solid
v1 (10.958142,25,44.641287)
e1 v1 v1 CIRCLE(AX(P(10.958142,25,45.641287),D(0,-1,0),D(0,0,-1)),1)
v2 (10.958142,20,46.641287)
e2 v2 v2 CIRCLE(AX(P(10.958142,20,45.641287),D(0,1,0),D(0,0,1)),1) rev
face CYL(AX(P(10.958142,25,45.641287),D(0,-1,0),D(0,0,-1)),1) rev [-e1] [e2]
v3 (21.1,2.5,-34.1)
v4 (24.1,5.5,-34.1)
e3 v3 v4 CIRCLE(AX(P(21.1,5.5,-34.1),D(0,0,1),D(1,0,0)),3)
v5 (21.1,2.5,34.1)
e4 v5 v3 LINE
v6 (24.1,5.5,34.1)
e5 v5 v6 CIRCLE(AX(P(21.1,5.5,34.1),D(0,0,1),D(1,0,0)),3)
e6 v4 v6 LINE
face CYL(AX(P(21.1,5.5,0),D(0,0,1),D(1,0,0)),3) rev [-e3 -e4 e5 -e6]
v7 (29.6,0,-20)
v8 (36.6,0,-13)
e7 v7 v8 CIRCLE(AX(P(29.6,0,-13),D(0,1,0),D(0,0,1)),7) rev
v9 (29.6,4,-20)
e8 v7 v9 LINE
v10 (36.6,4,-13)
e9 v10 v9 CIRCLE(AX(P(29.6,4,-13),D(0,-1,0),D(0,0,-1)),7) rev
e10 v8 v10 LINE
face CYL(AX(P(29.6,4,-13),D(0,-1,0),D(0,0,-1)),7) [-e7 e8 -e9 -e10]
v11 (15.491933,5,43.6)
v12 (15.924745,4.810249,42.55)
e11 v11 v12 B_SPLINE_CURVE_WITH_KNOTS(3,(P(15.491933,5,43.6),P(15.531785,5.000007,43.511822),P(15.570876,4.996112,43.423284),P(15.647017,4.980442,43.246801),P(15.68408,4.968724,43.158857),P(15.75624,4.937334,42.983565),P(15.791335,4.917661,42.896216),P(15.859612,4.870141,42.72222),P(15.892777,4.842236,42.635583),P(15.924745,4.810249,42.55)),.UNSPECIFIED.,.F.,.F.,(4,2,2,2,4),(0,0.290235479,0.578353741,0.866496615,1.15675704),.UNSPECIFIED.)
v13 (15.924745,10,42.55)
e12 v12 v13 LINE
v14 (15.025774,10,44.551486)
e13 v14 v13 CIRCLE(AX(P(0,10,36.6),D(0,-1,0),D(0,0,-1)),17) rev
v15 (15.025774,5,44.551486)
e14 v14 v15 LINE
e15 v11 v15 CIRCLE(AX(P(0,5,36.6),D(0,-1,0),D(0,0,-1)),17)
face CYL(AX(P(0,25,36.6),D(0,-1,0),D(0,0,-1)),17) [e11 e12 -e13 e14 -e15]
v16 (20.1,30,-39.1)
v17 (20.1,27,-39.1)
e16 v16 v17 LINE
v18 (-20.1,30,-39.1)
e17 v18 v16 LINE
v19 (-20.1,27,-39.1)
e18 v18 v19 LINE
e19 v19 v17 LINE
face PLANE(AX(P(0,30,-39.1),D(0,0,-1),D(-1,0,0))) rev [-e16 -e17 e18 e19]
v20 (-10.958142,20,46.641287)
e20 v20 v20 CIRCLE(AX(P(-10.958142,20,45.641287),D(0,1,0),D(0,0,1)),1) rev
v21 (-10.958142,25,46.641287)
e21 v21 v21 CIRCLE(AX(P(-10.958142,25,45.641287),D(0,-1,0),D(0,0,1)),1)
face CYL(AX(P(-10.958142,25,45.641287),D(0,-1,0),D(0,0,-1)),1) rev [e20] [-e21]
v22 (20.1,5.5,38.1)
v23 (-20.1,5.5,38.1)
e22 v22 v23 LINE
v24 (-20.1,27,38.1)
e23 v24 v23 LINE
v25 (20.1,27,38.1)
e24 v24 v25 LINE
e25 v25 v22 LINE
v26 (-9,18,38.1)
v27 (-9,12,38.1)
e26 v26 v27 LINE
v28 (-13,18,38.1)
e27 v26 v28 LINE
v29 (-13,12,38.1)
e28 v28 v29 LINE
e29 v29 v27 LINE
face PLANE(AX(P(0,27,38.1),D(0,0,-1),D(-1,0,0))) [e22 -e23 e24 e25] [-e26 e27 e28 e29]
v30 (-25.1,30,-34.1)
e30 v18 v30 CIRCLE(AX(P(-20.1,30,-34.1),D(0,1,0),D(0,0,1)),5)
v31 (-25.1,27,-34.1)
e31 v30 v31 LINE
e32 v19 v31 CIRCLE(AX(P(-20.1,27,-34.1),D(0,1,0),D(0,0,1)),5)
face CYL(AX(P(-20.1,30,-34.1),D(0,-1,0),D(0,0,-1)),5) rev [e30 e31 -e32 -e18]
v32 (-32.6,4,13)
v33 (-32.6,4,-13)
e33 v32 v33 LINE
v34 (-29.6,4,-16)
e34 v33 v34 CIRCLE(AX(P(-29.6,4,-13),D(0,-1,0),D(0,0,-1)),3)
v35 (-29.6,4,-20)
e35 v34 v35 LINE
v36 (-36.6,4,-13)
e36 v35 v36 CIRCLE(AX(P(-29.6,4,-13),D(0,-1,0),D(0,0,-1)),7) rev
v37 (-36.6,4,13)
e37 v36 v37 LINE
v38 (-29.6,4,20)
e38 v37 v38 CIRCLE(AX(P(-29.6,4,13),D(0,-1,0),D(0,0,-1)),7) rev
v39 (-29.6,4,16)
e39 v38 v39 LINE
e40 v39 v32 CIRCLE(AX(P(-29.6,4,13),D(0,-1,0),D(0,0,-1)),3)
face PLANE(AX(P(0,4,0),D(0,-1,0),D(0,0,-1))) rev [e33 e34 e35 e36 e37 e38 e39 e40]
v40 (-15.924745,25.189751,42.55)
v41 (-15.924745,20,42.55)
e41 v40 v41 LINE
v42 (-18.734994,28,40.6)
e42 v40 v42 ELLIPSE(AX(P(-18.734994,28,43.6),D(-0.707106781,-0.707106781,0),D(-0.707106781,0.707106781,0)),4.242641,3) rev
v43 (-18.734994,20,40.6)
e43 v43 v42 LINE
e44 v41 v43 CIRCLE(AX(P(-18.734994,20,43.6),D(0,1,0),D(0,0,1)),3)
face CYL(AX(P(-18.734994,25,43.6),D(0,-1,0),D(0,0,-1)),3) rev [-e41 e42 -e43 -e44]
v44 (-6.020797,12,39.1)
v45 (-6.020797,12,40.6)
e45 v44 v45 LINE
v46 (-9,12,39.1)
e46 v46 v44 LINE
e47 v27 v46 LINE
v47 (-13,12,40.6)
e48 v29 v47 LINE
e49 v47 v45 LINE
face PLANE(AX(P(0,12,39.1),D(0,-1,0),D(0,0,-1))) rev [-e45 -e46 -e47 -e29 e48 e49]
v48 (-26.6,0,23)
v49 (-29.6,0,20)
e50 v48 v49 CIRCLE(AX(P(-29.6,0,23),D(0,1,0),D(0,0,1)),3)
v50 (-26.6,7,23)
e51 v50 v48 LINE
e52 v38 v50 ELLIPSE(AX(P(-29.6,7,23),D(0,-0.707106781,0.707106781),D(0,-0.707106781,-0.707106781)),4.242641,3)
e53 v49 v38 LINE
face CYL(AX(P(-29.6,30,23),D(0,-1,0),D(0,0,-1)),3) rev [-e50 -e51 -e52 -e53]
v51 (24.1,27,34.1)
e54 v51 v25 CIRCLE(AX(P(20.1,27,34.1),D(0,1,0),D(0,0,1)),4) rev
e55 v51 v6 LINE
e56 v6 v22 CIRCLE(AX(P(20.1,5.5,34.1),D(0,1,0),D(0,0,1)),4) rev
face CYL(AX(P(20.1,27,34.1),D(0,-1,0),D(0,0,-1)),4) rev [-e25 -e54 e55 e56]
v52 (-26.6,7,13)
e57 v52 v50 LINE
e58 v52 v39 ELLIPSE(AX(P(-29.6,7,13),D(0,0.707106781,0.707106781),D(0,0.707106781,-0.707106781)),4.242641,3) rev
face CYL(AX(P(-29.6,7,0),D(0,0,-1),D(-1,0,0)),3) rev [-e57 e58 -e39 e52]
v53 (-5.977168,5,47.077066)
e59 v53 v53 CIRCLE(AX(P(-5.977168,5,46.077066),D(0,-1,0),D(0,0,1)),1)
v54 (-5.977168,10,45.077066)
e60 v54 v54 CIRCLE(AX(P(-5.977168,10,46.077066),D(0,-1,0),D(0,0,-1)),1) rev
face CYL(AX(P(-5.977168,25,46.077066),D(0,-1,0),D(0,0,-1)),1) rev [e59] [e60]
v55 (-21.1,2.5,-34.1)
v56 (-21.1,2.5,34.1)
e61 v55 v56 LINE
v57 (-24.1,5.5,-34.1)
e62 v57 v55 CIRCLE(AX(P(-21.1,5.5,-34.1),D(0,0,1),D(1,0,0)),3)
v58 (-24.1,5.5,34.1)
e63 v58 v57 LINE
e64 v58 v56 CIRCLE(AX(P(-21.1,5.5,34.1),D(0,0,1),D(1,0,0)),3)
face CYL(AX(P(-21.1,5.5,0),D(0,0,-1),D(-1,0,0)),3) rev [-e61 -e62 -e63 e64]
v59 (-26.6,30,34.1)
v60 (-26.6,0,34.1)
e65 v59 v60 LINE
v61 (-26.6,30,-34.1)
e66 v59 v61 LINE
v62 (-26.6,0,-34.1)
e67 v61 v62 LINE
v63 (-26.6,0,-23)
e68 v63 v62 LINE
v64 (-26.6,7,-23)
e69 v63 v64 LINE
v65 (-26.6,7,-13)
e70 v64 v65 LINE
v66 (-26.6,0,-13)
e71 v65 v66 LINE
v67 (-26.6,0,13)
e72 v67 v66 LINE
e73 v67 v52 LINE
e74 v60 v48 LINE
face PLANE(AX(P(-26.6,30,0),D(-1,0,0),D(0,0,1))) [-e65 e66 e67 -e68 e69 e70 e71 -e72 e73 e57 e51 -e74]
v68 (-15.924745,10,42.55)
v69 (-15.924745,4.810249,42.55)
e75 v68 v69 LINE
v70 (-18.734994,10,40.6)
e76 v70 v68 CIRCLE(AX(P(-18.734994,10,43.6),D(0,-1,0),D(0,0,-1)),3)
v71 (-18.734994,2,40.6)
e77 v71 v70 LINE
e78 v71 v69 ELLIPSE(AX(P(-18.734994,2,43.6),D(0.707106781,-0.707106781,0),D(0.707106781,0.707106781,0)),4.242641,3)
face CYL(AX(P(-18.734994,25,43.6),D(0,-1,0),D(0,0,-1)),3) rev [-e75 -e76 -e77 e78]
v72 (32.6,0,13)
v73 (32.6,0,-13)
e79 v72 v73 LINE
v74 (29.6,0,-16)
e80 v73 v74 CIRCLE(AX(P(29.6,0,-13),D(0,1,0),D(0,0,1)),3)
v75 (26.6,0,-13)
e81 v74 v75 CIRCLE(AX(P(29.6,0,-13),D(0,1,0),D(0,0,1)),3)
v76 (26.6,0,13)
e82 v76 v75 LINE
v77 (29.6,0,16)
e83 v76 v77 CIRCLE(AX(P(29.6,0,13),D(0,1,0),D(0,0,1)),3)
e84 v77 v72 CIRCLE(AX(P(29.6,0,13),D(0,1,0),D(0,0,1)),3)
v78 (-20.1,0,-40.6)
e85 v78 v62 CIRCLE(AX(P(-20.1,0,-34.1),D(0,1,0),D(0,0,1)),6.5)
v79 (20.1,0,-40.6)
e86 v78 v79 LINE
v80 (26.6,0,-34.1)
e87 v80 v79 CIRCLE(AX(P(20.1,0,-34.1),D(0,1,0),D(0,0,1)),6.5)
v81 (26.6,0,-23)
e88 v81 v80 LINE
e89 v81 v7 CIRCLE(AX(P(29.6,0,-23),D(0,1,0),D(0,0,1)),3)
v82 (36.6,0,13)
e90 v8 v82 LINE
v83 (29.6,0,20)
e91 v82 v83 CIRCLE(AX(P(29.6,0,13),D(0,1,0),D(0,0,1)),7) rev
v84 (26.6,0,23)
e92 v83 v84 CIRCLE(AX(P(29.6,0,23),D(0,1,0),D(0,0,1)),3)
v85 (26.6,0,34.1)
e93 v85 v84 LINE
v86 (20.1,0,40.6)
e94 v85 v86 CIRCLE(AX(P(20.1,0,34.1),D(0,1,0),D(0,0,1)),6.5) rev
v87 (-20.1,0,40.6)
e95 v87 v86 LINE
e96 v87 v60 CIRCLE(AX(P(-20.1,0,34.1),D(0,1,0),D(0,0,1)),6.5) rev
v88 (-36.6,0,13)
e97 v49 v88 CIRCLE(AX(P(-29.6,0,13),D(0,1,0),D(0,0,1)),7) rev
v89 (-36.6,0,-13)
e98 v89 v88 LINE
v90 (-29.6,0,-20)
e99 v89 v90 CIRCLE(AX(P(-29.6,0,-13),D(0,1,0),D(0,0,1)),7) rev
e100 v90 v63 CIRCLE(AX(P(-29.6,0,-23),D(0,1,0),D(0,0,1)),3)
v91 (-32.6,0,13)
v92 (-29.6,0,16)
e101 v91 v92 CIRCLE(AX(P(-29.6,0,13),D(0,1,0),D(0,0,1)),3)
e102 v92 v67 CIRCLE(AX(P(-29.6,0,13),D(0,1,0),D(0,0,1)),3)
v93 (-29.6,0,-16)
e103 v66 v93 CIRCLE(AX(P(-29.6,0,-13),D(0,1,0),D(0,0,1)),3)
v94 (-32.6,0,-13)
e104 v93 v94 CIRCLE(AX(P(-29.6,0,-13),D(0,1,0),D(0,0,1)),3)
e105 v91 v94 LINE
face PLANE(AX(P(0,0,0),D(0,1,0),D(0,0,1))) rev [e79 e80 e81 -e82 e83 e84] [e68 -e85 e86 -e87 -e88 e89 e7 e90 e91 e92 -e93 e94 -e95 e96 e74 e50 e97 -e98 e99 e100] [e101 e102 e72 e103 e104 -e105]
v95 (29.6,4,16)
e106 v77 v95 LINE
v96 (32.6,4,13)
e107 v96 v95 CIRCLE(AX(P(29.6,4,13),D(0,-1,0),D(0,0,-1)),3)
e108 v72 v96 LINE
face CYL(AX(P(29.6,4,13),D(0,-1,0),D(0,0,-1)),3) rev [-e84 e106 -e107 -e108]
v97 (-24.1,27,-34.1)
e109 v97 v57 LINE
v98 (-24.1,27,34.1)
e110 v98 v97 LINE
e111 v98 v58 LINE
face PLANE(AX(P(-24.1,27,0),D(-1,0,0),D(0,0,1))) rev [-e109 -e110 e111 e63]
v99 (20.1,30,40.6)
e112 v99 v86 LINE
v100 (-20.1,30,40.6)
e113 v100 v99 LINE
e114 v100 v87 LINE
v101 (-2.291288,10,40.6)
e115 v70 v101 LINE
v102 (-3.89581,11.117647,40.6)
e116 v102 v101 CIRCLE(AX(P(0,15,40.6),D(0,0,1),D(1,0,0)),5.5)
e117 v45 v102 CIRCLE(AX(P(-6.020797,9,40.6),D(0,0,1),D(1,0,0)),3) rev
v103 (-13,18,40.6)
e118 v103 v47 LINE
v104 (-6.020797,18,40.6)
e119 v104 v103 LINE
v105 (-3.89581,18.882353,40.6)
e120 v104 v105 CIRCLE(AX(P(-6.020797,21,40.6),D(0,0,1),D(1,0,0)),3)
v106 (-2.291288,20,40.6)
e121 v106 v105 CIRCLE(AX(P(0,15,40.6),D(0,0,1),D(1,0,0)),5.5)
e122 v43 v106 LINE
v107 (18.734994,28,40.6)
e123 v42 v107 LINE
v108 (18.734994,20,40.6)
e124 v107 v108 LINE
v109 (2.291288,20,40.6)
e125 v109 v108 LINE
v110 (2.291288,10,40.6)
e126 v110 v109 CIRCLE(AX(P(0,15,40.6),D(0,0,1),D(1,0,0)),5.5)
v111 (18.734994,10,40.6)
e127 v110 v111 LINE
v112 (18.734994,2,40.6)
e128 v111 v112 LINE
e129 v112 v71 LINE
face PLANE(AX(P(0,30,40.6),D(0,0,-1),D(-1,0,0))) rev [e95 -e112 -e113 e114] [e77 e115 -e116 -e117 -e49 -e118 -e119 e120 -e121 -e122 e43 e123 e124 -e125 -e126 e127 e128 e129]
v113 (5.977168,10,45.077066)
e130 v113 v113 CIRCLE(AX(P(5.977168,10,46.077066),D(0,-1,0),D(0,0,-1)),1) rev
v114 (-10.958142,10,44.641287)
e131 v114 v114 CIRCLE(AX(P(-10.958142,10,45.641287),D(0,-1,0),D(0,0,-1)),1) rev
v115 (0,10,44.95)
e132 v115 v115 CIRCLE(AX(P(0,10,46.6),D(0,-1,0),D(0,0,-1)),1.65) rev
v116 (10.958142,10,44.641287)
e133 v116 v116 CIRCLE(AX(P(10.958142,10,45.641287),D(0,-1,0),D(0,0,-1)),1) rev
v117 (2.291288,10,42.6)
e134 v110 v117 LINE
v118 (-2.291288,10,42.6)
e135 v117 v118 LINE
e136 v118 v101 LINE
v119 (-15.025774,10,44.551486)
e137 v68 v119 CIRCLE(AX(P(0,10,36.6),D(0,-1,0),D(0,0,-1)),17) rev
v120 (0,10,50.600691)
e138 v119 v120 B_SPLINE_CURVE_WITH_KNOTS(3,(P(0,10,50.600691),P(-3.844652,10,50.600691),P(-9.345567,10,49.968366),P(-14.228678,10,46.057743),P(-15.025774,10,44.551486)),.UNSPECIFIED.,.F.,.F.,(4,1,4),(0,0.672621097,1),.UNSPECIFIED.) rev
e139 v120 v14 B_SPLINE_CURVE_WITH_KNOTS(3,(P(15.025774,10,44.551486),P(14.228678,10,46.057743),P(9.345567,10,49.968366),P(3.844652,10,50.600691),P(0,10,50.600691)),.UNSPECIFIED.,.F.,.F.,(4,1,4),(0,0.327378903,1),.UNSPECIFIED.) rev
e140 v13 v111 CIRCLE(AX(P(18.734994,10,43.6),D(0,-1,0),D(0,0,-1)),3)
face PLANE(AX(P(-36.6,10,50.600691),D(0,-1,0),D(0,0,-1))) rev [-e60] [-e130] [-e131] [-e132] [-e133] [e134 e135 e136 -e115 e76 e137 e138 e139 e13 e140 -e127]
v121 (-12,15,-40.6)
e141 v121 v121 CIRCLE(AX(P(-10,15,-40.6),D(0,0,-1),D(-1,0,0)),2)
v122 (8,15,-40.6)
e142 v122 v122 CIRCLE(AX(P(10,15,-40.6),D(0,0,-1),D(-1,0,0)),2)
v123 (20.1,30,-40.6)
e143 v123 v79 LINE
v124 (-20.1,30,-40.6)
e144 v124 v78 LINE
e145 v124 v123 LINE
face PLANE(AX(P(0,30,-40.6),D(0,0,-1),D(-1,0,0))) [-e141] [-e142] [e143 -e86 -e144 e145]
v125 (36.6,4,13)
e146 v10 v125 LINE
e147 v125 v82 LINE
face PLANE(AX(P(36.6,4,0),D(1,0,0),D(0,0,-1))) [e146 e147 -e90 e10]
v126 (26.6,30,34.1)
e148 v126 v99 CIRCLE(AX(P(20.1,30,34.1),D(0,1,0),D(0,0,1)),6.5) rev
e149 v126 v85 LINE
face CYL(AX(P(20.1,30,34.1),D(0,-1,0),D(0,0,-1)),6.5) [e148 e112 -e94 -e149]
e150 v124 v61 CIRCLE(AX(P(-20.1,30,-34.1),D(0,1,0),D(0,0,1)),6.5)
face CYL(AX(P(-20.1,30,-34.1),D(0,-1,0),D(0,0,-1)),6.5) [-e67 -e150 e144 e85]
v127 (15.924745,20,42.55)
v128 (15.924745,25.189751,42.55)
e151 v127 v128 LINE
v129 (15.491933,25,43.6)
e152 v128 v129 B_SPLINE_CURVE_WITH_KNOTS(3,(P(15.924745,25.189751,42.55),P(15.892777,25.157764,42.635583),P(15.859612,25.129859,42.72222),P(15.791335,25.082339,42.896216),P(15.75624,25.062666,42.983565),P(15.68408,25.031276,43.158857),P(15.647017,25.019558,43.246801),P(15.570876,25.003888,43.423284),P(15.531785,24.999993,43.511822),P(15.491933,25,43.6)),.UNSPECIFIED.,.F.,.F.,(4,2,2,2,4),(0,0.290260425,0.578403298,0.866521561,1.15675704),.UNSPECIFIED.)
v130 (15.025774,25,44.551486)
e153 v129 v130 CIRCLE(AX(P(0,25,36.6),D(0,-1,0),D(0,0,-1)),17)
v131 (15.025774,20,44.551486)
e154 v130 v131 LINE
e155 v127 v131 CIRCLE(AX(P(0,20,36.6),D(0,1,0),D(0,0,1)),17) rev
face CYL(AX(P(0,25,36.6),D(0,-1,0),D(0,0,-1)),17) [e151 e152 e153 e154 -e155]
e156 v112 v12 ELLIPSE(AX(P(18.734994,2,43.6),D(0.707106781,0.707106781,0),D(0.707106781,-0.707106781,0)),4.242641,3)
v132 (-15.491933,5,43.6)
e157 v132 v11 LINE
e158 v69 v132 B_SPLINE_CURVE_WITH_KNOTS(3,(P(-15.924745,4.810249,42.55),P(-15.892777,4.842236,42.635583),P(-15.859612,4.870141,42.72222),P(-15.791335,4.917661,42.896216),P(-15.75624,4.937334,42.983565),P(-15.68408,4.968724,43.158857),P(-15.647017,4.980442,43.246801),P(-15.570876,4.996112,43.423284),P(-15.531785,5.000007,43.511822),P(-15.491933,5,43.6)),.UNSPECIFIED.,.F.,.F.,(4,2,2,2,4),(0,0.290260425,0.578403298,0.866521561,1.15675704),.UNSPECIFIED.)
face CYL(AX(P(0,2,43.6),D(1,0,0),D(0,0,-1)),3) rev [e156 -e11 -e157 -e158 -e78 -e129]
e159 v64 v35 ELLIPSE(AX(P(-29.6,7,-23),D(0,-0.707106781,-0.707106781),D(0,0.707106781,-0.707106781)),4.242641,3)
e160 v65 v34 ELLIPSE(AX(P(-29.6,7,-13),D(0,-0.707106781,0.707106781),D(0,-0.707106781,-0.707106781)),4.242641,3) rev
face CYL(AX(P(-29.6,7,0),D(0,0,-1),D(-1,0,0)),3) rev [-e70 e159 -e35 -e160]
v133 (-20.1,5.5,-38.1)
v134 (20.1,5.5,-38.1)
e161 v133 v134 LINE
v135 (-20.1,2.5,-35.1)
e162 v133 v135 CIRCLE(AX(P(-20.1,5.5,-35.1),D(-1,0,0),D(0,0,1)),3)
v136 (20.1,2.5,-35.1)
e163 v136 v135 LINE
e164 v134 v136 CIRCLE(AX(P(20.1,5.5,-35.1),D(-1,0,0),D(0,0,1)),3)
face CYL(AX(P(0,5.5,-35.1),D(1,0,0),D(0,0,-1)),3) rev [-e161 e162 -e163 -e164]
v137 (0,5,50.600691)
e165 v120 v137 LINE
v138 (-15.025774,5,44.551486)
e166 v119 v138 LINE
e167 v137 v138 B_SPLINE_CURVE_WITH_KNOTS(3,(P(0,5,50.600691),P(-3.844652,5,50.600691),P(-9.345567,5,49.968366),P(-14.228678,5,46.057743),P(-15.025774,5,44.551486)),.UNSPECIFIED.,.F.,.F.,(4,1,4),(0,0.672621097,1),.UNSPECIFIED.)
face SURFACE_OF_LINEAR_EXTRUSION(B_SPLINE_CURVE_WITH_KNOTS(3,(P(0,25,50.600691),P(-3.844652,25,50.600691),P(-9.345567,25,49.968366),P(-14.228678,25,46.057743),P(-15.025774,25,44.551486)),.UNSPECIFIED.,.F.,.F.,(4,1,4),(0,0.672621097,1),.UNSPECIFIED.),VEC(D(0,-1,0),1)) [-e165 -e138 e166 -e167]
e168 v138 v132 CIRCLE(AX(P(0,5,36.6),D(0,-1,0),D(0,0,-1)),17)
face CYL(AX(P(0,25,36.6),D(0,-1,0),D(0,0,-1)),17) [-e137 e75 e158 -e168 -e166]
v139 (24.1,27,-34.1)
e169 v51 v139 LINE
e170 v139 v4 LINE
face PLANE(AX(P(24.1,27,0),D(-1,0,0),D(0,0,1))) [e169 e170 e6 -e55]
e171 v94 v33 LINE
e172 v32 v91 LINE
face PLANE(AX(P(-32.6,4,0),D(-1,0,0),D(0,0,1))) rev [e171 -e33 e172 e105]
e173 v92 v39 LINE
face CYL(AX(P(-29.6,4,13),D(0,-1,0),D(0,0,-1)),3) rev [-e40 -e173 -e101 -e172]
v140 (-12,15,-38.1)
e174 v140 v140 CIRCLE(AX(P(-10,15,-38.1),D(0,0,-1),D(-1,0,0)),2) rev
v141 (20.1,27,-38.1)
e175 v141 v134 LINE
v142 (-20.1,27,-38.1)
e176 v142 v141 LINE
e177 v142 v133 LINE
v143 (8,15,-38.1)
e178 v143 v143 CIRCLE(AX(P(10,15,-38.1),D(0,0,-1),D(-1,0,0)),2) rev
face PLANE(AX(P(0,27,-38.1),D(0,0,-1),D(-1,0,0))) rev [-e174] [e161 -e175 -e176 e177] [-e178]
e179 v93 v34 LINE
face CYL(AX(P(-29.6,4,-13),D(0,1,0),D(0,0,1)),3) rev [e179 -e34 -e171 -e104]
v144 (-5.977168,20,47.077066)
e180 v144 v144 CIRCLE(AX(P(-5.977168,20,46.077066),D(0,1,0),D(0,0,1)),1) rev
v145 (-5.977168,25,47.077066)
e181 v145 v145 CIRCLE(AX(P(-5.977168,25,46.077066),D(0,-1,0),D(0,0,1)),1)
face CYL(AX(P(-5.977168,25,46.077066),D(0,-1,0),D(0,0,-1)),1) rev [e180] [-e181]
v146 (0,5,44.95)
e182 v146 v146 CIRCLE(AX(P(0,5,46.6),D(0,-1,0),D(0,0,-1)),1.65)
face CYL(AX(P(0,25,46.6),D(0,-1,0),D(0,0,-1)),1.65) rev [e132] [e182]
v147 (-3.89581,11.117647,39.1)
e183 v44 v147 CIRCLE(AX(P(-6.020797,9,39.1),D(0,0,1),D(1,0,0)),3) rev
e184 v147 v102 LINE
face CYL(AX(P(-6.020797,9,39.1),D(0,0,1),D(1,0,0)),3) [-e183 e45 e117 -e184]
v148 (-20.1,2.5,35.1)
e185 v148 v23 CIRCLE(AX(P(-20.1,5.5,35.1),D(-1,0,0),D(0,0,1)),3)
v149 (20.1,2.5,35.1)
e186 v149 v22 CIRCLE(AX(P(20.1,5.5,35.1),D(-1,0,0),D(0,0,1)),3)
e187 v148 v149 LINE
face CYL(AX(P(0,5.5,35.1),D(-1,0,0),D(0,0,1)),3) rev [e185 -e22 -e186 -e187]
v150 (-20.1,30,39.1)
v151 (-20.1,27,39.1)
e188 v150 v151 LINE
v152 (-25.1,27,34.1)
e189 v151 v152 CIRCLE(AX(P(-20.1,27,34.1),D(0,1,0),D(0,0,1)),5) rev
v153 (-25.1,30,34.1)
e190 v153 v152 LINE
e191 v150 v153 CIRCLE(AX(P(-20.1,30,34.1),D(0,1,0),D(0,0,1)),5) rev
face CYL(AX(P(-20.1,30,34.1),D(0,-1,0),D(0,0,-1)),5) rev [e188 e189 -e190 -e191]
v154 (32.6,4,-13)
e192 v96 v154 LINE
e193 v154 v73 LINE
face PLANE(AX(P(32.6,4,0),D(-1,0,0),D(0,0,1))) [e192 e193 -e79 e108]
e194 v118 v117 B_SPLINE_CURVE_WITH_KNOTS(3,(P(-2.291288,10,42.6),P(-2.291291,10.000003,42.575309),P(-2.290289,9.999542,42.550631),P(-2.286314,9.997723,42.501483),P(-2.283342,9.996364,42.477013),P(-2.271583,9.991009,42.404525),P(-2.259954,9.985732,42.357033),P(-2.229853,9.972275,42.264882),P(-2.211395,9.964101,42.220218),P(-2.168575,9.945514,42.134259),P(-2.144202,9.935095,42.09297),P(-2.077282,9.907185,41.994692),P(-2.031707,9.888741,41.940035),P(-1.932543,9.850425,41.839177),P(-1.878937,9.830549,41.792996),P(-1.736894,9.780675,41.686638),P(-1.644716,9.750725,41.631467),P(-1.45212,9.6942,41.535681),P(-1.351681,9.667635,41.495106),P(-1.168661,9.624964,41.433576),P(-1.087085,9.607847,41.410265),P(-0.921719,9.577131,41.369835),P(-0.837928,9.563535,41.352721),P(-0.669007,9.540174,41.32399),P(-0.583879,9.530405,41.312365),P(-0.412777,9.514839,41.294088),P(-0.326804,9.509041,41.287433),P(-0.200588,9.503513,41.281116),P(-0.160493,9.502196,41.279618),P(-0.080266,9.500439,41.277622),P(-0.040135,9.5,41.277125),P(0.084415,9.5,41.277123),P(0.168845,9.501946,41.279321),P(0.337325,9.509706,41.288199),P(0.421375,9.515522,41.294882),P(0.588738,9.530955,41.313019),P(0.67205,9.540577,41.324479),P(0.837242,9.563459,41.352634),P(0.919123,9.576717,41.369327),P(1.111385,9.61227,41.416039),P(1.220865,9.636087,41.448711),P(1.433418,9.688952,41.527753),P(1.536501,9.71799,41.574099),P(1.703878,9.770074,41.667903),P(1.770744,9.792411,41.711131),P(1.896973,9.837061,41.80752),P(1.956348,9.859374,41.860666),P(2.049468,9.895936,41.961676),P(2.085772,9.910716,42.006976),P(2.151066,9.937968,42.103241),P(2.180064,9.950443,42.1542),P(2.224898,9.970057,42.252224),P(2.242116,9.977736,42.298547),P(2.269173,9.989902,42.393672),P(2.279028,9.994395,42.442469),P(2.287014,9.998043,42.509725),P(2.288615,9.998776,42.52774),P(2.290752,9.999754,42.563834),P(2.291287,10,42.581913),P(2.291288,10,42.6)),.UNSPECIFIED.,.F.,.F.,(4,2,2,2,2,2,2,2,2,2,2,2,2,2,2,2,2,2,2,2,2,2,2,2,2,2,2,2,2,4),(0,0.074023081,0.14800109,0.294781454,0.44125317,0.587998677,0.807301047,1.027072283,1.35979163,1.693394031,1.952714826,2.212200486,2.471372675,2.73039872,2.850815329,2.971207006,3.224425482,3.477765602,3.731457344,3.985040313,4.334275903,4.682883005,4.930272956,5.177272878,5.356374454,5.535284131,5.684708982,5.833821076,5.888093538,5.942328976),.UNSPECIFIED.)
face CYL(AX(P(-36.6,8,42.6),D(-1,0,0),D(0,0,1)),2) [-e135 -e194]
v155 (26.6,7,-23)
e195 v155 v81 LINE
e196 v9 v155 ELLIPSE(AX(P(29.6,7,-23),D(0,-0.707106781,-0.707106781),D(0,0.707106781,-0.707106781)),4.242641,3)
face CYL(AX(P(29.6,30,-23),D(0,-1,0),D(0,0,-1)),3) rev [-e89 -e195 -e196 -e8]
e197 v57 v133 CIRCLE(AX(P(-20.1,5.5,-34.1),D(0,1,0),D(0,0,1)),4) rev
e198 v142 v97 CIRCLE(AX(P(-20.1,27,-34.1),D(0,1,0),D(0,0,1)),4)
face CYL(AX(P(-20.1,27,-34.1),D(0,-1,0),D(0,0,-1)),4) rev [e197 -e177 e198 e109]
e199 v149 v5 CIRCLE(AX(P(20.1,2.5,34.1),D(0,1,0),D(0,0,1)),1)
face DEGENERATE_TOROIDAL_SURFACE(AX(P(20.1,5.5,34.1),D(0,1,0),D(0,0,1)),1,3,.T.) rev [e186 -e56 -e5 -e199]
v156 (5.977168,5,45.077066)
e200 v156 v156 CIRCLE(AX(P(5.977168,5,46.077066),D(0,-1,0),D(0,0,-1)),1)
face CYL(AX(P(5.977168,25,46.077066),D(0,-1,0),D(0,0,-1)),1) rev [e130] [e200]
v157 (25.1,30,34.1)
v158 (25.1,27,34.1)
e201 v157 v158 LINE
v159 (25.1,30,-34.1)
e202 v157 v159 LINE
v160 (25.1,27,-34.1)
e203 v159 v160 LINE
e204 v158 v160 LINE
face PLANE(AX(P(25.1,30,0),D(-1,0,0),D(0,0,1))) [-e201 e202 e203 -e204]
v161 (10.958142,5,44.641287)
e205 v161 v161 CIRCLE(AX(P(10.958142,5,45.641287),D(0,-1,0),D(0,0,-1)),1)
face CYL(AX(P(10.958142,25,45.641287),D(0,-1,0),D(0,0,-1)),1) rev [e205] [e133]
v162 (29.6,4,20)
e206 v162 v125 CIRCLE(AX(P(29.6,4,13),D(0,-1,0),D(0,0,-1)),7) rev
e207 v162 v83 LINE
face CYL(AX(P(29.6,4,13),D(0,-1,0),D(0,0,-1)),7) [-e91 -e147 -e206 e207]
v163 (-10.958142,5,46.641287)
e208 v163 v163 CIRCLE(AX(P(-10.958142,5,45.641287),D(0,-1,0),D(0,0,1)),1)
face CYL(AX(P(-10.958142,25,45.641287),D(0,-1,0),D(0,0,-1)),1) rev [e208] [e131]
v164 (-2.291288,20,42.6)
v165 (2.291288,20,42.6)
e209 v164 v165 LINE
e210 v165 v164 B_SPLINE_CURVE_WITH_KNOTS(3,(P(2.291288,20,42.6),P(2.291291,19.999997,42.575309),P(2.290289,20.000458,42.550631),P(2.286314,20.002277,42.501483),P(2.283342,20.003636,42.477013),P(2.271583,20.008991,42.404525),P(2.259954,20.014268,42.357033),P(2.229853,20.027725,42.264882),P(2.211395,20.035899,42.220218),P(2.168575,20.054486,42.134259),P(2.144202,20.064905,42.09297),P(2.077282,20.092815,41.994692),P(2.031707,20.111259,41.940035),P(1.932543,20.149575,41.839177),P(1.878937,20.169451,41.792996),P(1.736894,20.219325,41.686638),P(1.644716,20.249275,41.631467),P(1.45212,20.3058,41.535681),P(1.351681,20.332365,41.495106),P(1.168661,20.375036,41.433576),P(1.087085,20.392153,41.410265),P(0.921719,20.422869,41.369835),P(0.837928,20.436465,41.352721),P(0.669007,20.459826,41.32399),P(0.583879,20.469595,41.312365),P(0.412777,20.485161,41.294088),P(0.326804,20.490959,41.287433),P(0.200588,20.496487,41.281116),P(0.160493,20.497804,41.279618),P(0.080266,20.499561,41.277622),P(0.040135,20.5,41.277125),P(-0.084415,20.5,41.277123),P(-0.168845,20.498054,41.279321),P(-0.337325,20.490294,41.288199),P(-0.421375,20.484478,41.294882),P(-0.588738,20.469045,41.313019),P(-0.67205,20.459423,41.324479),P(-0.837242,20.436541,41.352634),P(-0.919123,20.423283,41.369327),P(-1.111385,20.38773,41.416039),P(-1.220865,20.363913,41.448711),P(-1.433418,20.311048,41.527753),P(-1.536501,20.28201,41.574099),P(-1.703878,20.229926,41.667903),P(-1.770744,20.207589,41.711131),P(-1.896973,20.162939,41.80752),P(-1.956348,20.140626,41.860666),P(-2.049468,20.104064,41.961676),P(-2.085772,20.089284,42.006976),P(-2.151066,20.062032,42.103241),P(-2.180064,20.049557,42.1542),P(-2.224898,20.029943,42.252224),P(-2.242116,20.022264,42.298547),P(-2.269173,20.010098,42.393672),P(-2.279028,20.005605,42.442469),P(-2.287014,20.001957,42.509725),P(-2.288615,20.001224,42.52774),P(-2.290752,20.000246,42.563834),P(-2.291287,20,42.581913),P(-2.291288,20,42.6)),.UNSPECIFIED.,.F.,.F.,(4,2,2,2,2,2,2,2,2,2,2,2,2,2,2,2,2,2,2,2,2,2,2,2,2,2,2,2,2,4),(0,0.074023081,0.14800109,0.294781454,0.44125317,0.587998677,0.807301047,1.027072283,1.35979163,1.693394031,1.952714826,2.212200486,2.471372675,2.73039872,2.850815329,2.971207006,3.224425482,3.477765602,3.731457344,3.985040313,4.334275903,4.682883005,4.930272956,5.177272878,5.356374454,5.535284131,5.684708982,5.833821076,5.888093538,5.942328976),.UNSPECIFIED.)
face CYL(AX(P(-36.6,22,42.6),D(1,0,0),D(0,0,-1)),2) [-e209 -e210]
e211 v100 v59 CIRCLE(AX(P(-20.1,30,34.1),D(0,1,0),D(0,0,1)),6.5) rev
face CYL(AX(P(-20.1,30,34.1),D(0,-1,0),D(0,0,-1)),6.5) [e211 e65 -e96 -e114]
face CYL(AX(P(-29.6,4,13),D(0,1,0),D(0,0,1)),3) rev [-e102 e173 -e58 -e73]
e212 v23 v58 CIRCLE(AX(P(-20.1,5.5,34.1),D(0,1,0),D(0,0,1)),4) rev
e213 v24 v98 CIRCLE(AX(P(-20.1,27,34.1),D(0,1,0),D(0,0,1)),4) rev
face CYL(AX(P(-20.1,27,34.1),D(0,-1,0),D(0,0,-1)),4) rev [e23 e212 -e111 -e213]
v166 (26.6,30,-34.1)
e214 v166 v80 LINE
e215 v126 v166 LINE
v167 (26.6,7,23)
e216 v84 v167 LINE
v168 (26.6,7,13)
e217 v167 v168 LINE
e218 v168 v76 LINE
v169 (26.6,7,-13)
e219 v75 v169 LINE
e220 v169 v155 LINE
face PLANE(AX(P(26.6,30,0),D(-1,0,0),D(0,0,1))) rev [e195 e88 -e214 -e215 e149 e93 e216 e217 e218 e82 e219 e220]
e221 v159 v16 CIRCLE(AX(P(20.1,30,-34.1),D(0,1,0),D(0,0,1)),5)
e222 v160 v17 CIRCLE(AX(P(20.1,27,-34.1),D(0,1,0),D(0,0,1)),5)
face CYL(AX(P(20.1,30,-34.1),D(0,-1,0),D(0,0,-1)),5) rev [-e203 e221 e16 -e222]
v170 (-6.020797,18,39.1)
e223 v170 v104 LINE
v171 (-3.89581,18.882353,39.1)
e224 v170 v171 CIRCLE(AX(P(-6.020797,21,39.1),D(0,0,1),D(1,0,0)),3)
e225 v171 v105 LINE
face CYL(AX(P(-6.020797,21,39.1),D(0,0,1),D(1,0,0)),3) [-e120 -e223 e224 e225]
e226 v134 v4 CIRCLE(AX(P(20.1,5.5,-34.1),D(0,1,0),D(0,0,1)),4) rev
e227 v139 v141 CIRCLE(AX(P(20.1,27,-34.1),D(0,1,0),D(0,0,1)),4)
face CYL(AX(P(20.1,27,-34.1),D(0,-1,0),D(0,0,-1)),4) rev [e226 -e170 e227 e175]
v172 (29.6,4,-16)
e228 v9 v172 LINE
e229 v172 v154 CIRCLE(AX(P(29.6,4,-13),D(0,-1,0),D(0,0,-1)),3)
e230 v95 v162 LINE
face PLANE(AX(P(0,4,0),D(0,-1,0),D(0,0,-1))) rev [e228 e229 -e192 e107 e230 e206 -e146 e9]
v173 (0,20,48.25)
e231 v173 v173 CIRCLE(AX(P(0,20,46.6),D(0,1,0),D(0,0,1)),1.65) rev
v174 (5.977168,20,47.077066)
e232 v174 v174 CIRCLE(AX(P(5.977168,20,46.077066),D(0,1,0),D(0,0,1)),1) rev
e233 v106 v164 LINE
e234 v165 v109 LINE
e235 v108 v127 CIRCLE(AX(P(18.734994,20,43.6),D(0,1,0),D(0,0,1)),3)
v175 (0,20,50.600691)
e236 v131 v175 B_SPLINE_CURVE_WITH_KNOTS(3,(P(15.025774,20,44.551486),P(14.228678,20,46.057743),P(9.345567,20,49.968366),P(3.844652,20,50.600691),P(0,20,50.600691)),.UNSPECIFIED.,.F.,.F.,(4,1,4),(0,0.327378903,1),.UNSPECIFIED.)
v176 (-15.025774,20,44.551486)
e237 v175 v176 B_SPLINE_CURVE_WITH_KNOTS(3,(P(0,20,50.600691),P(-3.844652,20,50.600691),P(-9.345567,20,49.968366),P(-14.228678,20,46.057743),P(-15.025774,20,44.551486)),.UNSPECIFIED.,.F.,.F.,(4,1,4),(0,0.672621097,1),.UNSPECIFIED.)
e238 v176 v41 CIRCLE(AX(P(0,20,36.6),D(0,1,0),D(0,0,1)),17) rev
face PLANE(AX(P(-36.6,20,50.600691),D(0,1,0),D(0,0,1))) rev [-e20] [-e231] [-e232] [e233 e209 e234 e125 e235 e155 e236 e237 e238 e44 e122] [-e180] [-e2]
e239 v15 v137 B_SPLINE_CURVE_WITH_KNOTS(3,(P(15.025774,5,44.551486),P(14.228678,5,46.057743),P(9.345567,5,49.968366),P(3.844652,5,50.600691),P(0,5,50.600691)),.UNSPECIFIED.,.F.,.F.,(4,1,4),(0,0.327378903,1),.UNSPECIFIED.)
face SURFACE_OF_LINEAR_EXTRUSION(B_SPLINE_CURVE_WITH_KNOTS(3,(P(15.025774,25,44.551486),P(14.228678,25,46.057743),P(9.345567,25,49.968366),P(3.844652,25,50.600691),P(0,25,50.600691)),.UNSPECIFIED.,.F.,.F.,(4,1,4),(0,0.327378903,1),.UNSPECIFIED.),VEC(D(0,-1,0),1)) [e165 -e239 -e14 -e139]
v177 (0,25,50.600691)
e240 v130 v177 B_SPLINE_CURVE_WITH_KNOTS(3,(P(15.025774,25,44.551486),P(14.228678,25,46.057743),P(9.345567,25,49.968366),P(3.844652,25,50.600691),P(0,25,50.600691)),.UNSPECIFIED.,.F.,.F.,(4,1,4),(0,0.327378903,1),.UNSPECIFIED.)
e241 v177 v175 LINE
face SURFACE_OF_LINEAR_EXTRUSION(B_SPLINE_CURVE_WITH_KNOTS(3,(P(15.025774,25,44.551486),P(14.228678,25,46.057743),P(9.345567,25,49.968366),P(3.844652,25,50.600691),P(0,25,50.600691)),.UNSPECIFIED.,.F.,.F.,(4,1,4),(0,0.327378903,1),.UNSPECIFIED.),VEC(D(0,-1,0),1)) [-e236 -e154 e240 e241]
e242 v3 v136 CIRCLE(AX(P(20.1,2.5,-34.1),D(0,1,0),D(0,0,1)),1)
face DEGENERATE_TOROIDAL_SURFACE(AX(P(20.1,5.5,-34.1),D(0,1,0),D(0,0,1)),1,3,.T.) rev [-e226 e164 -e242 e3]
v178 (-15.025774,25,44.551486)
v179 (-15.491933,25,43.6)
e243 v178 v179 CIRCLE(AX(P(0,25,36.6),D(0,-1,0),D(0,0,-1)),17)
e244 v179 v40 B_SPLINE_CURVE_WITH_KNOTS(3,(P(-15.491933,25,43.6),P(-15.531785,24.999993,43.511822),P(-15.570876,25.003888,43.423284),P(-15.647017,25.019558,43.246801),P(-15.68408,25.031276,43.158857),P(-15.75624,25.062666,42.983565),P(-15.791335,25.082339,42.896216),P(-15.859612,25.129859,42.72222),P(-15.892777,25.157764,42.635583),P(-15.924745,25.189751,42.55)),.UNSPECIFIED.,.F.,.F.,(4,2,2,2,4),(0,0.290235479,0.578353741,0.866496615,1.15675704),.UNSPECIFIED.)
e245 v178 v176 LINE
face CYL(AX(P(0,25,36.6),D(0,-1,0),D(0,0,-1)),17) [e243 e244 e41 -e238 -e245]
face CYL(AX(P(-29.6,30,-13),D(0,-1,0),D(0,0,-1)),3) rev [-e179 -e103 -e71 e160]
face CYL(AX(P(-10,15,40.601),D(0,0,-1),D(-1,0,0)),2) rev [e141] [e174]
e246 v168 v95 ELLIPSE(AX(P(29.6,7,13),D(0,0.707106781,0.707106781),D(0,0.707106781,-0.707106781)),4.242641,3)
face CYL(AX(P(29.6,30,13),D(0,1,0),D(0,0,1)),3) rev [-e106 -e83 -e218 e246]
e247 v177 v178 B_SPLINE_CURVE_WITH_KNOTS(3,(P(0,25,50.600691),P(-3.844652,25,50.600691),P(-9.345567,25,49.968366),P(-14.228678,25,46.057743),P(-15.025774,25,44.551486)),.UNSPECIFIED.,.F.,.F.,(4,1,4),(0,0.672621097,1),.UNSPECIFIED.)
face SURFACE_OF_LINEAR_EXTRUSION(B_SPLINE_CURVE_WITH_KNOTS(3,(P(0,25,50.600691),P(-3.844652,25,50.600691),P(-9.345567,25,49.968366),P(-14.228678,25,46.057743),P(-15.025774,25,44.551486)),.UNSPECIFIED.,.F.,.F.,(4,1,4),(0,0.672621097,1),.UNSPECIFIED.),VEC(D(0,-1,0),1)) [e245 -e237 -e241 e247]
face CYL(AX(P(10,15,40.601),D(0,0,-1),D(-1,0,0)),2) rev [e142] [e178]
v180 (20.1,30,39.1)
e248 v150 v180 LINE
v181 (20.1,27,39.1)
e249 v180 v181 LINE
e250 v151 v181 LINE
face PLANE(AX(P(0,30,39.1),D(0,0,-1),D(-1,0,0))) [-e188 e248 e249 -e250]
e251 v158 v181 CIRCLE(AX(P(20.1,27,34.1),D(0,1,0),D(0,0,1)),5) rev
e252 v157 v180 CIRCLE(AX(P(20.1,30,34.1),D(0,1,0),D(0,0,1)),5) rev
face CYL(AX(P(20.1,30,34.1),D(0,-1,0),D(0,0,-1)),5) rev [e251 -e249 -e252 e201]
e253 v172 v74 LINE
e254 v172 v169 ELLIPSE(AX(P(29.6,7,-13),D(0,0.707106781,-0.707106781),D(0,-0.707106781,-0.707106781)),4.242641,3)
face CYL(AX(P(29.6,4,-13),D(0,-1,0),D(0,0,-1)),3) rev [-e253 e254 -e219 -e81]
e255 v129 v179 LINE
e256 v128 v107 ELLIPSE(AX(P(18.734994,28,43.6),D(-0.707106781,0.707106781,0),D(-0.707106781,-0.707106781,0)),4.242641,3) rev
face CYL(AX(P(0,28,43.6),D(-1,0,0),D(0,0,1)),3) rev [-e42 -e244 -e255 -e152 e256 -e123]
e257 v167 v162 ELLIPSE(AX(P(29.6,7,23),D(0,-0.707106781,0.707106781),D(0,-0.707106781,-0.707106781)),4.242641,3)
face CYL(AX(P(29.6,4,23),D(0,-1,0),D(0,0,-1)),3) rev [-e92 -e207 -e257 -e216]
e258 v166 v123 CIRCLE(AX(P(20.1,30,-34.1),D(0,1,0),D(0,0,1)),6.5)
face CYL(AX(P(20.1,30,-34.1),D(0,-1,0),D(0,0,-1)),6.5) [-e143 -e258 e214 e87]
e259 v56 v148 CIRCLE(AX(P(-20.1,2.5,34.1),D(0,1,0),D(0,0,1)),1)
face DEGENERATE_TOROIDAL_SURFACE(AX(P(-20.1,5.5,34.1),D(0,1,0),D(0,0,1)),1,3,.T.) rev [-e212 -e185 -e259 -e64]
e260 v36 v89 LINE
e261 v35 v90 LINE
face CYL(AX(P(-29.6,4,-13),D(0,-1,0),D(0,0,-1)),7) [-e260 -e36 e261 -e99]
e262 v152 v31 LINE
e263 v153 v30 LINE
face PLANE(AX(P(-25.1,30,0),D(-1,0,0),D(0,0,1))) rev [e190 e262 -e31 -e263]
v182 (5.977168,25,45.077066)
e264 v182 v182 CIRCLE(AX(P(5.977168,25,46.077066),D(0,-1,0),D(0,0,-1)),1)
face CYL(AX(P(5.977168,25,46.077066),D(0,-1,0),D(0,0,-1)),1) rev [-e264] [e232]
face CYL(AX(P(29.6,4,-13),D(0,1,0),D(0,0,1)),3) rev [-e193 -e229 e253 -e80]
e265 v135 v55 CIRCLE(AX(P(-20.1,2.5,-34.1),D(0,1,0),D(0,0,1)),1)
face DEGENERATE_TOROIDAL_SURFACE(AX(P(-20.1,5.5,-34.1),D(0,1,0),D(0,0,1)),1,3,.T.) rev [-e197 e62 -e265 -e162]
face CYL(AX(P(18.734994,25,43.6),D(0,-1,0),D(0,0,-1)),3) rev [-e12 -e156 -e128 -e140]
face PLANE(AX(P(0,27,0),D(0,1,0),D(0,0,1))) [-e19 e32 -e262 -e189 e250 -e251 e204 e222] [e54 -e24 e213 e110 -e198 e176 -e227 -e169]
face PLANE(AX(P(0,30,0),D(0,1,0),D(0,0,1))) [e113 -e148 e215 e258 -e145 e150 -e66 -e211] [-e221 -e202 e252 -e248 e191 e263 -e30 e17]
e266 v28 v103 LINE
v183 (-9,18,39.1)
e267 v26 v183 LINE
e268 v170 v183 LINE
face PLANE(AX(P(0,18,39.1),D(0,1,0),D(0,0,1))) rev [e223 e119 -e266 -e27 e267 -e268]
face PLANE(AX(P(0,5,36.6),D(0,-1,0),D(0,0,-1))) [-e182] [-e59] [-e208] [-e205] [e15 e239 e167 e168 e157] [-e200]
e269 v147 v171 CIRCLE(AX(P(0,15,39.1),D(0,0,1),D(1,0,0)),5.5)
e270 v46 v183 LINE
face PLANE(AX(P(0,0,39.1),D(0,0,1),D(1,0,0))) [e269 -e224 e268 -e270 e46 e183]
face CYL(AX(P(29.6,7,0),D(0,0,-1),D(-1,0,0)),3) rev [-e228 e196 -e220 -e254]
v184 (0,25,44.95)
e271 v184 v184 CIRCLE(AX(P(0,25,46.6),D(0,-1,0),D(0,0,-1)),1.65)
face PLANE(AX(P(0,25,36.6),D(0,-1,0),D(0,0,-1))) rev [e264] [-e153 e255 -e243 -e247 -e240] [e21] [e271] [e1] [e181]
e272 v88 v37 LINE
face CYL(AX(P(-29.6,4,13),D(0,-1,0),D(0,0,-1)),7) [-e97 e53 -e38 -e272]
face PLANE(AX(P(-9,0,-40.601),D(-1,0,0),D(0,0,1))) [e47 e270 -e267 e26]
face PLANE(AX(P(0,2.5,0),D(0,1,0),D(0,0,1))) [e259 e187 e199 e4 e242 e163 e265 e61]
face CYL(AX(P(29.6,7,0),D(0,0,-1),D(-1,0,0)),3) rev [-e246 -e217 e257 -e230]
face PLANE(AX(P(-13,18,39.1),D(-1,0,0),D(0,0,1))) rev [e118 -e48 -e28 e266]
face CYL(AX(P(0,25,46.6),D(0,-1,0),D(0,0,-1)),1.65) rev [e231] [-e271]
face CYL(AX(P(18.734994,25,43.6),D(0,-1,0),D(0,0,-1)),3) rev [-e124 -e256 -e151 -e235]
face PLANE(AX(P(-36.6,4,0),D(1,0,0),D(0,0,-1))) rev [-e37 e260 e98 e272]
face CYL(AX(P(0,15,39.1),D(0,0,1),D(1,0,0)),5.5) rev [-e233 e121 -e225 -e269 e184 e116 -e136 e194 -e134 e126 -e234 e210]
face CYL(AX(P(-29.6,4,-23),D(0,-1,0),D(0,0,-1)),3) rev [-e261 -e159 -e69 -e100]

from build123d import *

# Parameters (mm, degrees)
BOSS_EXTRUDE1_DEPTH      = 30
BOSS_EXTRUDE2_DEPTH      = 27
BOSS_EXTRUDE3_DEPTH      = 2.5
FILLET1_R                = 3
BORNIER_REACH            = 92.559
SKETCH3_R                = 2
BOSS_EXTRUDE4_DEPTH      = 4
FILLET2_R                = 3
FILLET3_R                = 7
BOSS_EXTRUDE6_DEPTH      = 10
BOSS_EXTRUDE6_DEPTH_BACK = 10
SKETCH5_R                = 1.65
SKETCH5_R_2              = 1
CUT_EXTRUDE2_DEPTH       = 70.28195973
CUT_EXTRUDE2_DEPTH_BACK  = 70.28195973
SKETCH6_W                = 10.000691042
SKETCH6_H                = 10
FILLET4_R                = 3
CUT_EXTRUDE3_DEPTH       = 1.5
CUT_EXTRUDE4_REACH       = 95.984
SKETCH7_3_W              = 4
SKETCH7_3_H              = 6
FILLET5_R                = 2


# Some blends are built 0.0001 mm under size
with BuildPart() as part:
    # Sketch1 → Boss-Extrude1 (new body)
    with BuildSketch(Plane(origin=(0, 0, 0), x_dir=(1, 0, 0), z_dir=(0, 1, 0))):
        with BuildLine():
            Line((-20.1, 40.6), (20.1, 40.6))
            ThreePointArc((20.1, 40.6), (24.696194078, 38.696194078), (26.6, 34.1))
            Line((26.6, 34.1), (26.6, -34.1))
            ThreePointArc((26.6, -34.1), (24.696194078, -38.696194078), (20.1, -40.6))
            Line((20.1, -40.6), (-20.1, -40.6))
            ThreePointArc((-20.1, -40.6), (-24.696194078, -38.696194078), (-26.6, -34.1))
            Line((-26.6, -34.1), (-26.6, 34.1))
            ThreePointArc((-26.6, 34.1), (-24.696194078, 38.696194078), (-20.1, 40.6))
        make_face()
        with BuildLine():
            ThreePointArc((-20.1, 39.1), (-23.635533906, 37.635533906), (-25.1, 34.1))
            Line((-25.1, 34.1), (-25.1, -34.1))
            ThreePointArc((-25.1, -34.1), (-23.635533906, -37.635533906), (-20.1, -39.1))
            Line((-20.1, -39.1), (20.1, -39.1))
            ThreePointArc((20.1, -39.1), (23.635533906, -37.635533906), (25.1, -34.1))
            Line((25.1, -34.1), (25.1, 34.1))
            ThreePointArc((25.1, 34.1), (23.635533906, 37.635533906), (20.1, 39.1))
            Line((20.1, 39.1), (-20.1, 39.1))
        make_face(mode=Mode.SUBTRACT)
    extrude(amount=BOSS_EXTRUDE1_DEPTH)

    # Sketch1<3> → Boss-Extrude2 (add)
    with BuildSketch(Plane(origin=(0, 0, 0), x_dir=(1, 0, 0), z_dir=(0, 1, 0))):
        with BuildLine():
            Line((-20.1, 39.1), (20.1, 39.1))
            ThreePointArc((20.1, 39.1), (23.635533906, 37.635533906), (25.1, 34.1))
            Line((25.1, 34.1), (25.1, -34.1))
            ThreePointArc((25.1, -34.1), (23.635533906, -37.635533906), (20.1, -39.1))
            Line((20.1, -39.1), (-20.1, -39.1))
            ThreePointArc((-20.1, -39.1), (-23.635533906, -37.635533906), (-25.1, -34.1))
            Line((-25.1, -34.1), (-25.1, 34.1))
            ThreePointArc((-25.1, 34.1), (-23.635533906, 37.635533906), (-20.1, 39.1))
        make_face()
        with BuildLine():
            ThreePointArc((-20.1, 38.1), (-22.928427125, 36.928427125), (-24.1, 34.1))
            Line((-24.1, 34.1), (-24.1, -34.1))
            ThreePointArc((-24.1, -34.1), (-22.928427125, -36.928427125), (-20.1, -38.1))
            Line((-20.1, -38.1), (20.1, -38.1))
            ThreePointArc((20.1, -38.1), (22.928427125, -36.928427125), (24.1, -34.1))
            Line((24.1, -34.1), (24.1, 34.1))
            ThreePointArc((24.1, 34.1), (22.928427125, 36.928427125), (20.1, 38.1))
            Line((20.1, 38.1), (-20.1, 38.1))
        make_face(mode=Mode.SUBTRACT)
    extrude(amount=BOSS_EXTRUDE2_DEPTH)

    # Sketch1<4> → Boss-Extrude3 (add)
    with BuildSketch(Plane(origin=(0, 0, 0), x_dir=(1, 0, 0), z_dir=(0, 1, 0))):
        with BuildLine():
            Line((-20.1, 38.1), (20.1, 38.1))
            ThreePointArc((20.1, 38.1), (22.928427125, 36.928427125), (24.1, 34.1))
            Line((24.1, 34.1), (24.1, -34.1))
            ThreePointArc((24.1, -34.1), (22.928427125, -36.928427125), (20.1, -38.1))
            Line((20.1, -38.1), (-20.1, -38.1))
            ThreePointArc((-20.1, -38.1), (-22.928427125, -36.928427125), (-24.1, -34.1))
            Line((-24.1, -34.1), (-24.1, 34.1))
            ThreePointArc((-24.1, 34.1), (-22.928427125, 36.928427125), (-20.1, 38.1))
        make_face()
    extrude(amount=BOSS_EXTRUDE3_DEPTH)

    # Fillet1
    fillet1_edges = [part.edges().sort_by_distance(p)[0] for p in [
        (22.928427125, 2.5, 36.928427125),
        (-22.928427125, 2.5, -36.928427125),
        (0, 2.5, 38.1),
        (24.1, 2.5, 0),
        (22.928427125, 2.5, -36.928427125),
        (0, 2.5, -38.1),
        (-24.1, 2.5, 0),
        (-22.928427125, 2.5, 36.928427125),
    ]]
    fillet(fillet1_edges, radius=FILLET1_R)

    # Sketch3 → Bornier (cut, up to next)
    with BuildSketch(Plane(origin=(0, 0, -40.6), x_dir=(-1, 0, 0), z_dir=(0, 0, -1)), mode=Mode.PRIVATE) as bornier_sk1:
        with Locations((-10, 15)):
            Circle(SKETCH3_R)
    bornier_tool1 = extrude(bornier_sk1.sketch, amount=-BORNIER_REACH, mode=Mode.PRIVATE) & part.part
    # Sketch3 → Bornier (cut, up to next)
    with BuildSketch(Plane(origin=(0, 0, -40.6), x_dir=(-1, 0, 0), z_dir=(0, 0, -1)), mode=Mode.PRIVATE) as bornier_sk2:
        with Locations((10, 15)):
            Circle(SKETCH3_R)
    bornier_tool2 = extrude(bornier_sk2.sketch, amount=-BORNIER_REACH, mode=Mode.PRIVATE) & part.part
    add(bornier_tool1.solids().sort_by_distance((10, 15, -40.6))[0], mode=Mode.SUBTRACT)
    add(bornier_tool2.solids().sort_by_distance((-10, 15, -40.6))[0], mode=Mode.SUBTRACT)

    # Sketch4 → Boss-Extrude4 (add)
    with BuildSketch(Plane.XZ):
        Polygon((26.6, 16), (32.6, 16), (32.6, -16), (26.6, -16), (26.6, -20), (36.6, -20), (36.6, 20), (26.6, 20), align=None)
        Polygon((-26.6, 16), (-26.6, 20), (-36.6, 20), (-36.6, -20), (-26.6, -20), (-26.6, -16), (-32.6, -16), (-32.6, 16), align=None)
    extrude(amount=-BOSS_EXTRUDE4_DEPTH)

    # Fillet2
    fillet2_edges = [part.edges().sort_by_distance(p)[0] for p in [
        (32.6, 2, 16),
        (32.6, 2, -16),
        (26.6, 2, -20),
        (26.6, 2, -16),
        (26.6, 4, -18),
        (26.6, 4, 18),
        (26.6, 2, 20),
        (26.6, 2, 16),
        (-32.6, 2, -16),
        (-26.6, 2, -20),
        (-26.6, 4, -18),
        (-26.6, 2, -16),
        (-26.6, 4, 18),
        (-26.6, 2, 20),
        (-26.6, 2, 16),
        (-32.6, 2, 16),
    ]]
    fillet(fillet2_edges, radius=FILLET2_R - 0.0001)  # a hair under: the kernel refuses the full size

    # Fillet3
    fillet3_edges = [part.edges().sort_by_distance(p)[0] for p in [
        (-36.6, 2, -20),
        (-36.6, 2, 20),
        (36.6, 2, -20),
        (36.6, 2, 20),
    ]]
    fillet(fillet3_edges, radius=FILLET3_R)

    # Sketch5 → Boss-Extrude6 (add, two sides: drawn at the far end of the back side and taken through both)
    with BuildSketch(Plane(origin=(0, 15, 0), x_dir=(-1, 0, 0), z_dir=(0, -1, 0)).offset(-BOSS_EXTRUDE6_DEPTH_BACK)):
        with BuildLine():
            Line((16.522711642, -40.6), (-16.522711642, -40.6))
            ThreePointArc((-16.522711642, -40.6), (-15.897493185, -42.62243393), (-15.025773528, -44.551486018))
            add(Edge.make_bspline(
                [(-15.025773528, -44.551486018), (-14.228677761, -46.057742891), (-9.345567408, -49.968366267), (-3.844651769, -50.600691042), (0, -50.600691042)],
                knots=[0, 0, 0, 0, 0.327378903, 1, 1, 1, 1], degree=3))
            add(Edge.make_bspline(
                [(15.025773528, -44.551486018), (14.228677761, -46.057742891), (9.345567408, -49.968366267), (3.844651769, -50.600691042), (0, -50.600691042)],
                knots=[0, 0, 0, 0, 0.327378903, 1, 1, 1, 1], degree=3))
            ThreePointArc((15.025773528, -44.551486018), (15.897493185, -42.62243393), (16.522711642, -40.6))
        make_face()
        with Locations(Location((0, -46.6, 0), (0, 0, 90))):
            Circle(SKETCH5_R, mode=Mode.SUBTRACT)
        with Locations(Location((-5.977168189, -46.077065544, 0), (0, 0, 90))):
            Circle(SKETCH5_R_2, mode=Mode.SUBTRACT)
        with Locations(Location((-10.958141679, -45.64128683, 0), (0, 0, 90))):
            Circle(SKETCH5_R_2, mode=Mode.SUBTRACT)
        with Locations(Location((10.958141679, -45.64128683, 0), (0, 0, 270))):
            Circle(SKETCH5_R_2, mode=Mode.SUBTRACT)
        with Locations(Location((5.977168189, -46.077065544, 0), (0, 0, 270))):
            Circle(SKETCH5_R_2, mode=Mode.SUBTRACT)
    extrude(amount=BOSS_EXTRUDE6_DEPTH + BOSS_EXTRUDE6_DEPTH_BACK)

    # Sketch6 → Cut-Extrude2 (cut, two sides: drawn at the far end of the back side and taken through both)
    with BuildSketch(Plane(origin=(0, 0, 0), x_dir=(0, 0, -1), z_dir=(1, 0, 0)).offset(-CUT_EXTRUDE2_DEPTH_BACK)):
        with Locations((-45.600345521, 15)):
            Rectangle(SKETCH6_W, SKETCH6_H)
    extrude(amount=CUT_EXTRUDE2_DEPTH + CUT_EXTRUDE2_DEPTH_BACK, mode=Mode.SUBTRACT)

    # Fillet4
    fillet4_edges = [part.edges().sort_by_distance(p)[0] for p in [
        (-16.522711642, 22.5, 40.6),
        (16.522711642, 22.5, 40.6),
        (0, 25, 40.6),
        (0, 5, 40.6),
        (16.522711642, 7.5, 40.6),
        (-16.522711642, 7.5, 40.6),
    ]]
    fillet(fillet4_edges, radius=FILLET4_R)

    # Sketch7 → Cut-Extrude3 (cut)
    with BuildSketch(Plane.XY.offset(40.6)):
        with BuildLine():
            Line((-6.020797289, 18), (-13, 18))
            Line((-13, 18), (-13, 12))
            Line((-13, 12), (-6.020797289, 12))
            ThreePointArc((-6.020797289, 12), (-4.870349806, 11.770644436), (-3.895810011, 11.117647059))
            ThreePointArc((-3.895810011, 11.117647059), (5.5, 15), (-3.895810011, 18.882352941))
            ThreePointArc((-3.895810011, 18.882352941), (-4.870349806, 18.229355564), (-6.020797289, 18))
        make_face()
    extrude(amount=-CUT_EXTRUDE3_DEPTH, mode=Mode.SUBTRACT)

    # Sketch7<3> → Cut-Extrude4 (cut, up to next)
    with BuildSketch(Plane.XY.offset(40.6), mode=Mode.PRIVATE) as cut_extrude4_sk1:
        with Locations((-11, 15)):
            Rectangle(SKETCH7_3_W, SKETCH7_3_H)
    cut_extrude4_tool1 = extrude(cut_extrude4_sk1.sketch, amount=-CUT_EXTRUDE4_REACH, mode=Mode.PRIVATE) & part.part
    add(cut_extrude4_tool1.solids().sort_by_distance((-11, 15, 40.6))[0], mode=Mode.SUBTRACT)

    # Fillet5
    # the kernel refuses this fillet: 2 mm, written as the material it takes off along each edge
    with BuildSketch(Plane(origin=(-7.291287847, 10, 40.6), x_dir=(0, 0, 1), z_dir=(1, 0, 0))) as fillet5_piece_1_section:
        with BuildLine():
            CenterArc((FILLET5_R, FILLET5_R), FILLET5_R, 180, 90)
            Line((0, FILLET5_R), (-FILLET5_R * 0.02, FILLET5_R))
            Line((-FILLET5_R * 0.02, FILLET5_R), (-FILLET5_R * 0.02, -FILLET5_R * 0.02))
            Line((-FILLET5_R * 0.02, -FILLET5_R * 0.02), (FILLET5_R, -FILLET5_R * 0.02))
            Line((FILLET5_R, -FILLET5_R * 0.02), (FILLET5_R, 0))
        make_face()
    fillet5_piece_1 = extrude(amount=14.582575695, mode=Mode.PRIVATE)
    fillet5_piece_1 = split(fillet5_piece_1, bisect_by=Plane(origin=(-1.49e-07, 9.863484185, 40.6), z_dir=(0, 0, 1)), keep=Keep.TOP, mode=Mode.PRIVATE)
    fillet5_piece_1 = fillet5_piece_1 & Plane(origin=(0, 15, 41.29634072), x_dir=(-0.708329092870135, -0.7058823529411764, 0), z_dir=(0, 0, 1)) * Cylinder(5.5, 38, mode=Mode.PRIVATE)
    add(fillet5_piece_1, mode=Mode.SUBTRACT)
    with BuildSketch(Plane(origin=(7.291287847, 20, 40.6), x_dir=(0, 1, 0), z_dir=(-1, 0, 0))) as fillet5_piece_2_section:
        with BuildLine():
            CenterArc((FILLET5_R, -FILLET5_R), FILLET5_R, 90, 90)
            Line((0, -FILLET5_R), (-FILLET5_R * 0.02, -FILLET5_R))
            Line((-FILLET5_R * 0.02, -FILLET5_R), (-FILLET5_R * 0.02, FILLET5_R * 0.02))
            Line((-FILLET5_R * 0.02, FILLET5_R * 0.02), (FILLET5_R, FILLET5_R * 0.02))
            Line((FILLET5_R, FILLET5_R * 0.02), (FILLET5_R, 0))
        make_face()
    fillet5_piece_2 = extrude(amount=14.582575695, mode=Mode.PRIVATE)
    fillet5_piece_2 = split(fillet5_piece_2, bisect_by=Plane(origin=(1.13e-07, 20.136515828, 40.6), z_dir=(0, 0, 1)), keep=Keep.TOP, mode=Mode.PRIVATE)
    fillet5_piece_2 = fillet5_piece_2 & Plane(origin=(0, 15, 41.29634056), x_dir=(-0.708329092870135, -0.7058823529411764, 0), z_dir=(0, 0, 1)) * Cylinder(5.5, 38, mode=Mode.PRIVATE)
    add(fillet5_piece_2, mode=Mode.SUBTRACT)


solid = part.part
